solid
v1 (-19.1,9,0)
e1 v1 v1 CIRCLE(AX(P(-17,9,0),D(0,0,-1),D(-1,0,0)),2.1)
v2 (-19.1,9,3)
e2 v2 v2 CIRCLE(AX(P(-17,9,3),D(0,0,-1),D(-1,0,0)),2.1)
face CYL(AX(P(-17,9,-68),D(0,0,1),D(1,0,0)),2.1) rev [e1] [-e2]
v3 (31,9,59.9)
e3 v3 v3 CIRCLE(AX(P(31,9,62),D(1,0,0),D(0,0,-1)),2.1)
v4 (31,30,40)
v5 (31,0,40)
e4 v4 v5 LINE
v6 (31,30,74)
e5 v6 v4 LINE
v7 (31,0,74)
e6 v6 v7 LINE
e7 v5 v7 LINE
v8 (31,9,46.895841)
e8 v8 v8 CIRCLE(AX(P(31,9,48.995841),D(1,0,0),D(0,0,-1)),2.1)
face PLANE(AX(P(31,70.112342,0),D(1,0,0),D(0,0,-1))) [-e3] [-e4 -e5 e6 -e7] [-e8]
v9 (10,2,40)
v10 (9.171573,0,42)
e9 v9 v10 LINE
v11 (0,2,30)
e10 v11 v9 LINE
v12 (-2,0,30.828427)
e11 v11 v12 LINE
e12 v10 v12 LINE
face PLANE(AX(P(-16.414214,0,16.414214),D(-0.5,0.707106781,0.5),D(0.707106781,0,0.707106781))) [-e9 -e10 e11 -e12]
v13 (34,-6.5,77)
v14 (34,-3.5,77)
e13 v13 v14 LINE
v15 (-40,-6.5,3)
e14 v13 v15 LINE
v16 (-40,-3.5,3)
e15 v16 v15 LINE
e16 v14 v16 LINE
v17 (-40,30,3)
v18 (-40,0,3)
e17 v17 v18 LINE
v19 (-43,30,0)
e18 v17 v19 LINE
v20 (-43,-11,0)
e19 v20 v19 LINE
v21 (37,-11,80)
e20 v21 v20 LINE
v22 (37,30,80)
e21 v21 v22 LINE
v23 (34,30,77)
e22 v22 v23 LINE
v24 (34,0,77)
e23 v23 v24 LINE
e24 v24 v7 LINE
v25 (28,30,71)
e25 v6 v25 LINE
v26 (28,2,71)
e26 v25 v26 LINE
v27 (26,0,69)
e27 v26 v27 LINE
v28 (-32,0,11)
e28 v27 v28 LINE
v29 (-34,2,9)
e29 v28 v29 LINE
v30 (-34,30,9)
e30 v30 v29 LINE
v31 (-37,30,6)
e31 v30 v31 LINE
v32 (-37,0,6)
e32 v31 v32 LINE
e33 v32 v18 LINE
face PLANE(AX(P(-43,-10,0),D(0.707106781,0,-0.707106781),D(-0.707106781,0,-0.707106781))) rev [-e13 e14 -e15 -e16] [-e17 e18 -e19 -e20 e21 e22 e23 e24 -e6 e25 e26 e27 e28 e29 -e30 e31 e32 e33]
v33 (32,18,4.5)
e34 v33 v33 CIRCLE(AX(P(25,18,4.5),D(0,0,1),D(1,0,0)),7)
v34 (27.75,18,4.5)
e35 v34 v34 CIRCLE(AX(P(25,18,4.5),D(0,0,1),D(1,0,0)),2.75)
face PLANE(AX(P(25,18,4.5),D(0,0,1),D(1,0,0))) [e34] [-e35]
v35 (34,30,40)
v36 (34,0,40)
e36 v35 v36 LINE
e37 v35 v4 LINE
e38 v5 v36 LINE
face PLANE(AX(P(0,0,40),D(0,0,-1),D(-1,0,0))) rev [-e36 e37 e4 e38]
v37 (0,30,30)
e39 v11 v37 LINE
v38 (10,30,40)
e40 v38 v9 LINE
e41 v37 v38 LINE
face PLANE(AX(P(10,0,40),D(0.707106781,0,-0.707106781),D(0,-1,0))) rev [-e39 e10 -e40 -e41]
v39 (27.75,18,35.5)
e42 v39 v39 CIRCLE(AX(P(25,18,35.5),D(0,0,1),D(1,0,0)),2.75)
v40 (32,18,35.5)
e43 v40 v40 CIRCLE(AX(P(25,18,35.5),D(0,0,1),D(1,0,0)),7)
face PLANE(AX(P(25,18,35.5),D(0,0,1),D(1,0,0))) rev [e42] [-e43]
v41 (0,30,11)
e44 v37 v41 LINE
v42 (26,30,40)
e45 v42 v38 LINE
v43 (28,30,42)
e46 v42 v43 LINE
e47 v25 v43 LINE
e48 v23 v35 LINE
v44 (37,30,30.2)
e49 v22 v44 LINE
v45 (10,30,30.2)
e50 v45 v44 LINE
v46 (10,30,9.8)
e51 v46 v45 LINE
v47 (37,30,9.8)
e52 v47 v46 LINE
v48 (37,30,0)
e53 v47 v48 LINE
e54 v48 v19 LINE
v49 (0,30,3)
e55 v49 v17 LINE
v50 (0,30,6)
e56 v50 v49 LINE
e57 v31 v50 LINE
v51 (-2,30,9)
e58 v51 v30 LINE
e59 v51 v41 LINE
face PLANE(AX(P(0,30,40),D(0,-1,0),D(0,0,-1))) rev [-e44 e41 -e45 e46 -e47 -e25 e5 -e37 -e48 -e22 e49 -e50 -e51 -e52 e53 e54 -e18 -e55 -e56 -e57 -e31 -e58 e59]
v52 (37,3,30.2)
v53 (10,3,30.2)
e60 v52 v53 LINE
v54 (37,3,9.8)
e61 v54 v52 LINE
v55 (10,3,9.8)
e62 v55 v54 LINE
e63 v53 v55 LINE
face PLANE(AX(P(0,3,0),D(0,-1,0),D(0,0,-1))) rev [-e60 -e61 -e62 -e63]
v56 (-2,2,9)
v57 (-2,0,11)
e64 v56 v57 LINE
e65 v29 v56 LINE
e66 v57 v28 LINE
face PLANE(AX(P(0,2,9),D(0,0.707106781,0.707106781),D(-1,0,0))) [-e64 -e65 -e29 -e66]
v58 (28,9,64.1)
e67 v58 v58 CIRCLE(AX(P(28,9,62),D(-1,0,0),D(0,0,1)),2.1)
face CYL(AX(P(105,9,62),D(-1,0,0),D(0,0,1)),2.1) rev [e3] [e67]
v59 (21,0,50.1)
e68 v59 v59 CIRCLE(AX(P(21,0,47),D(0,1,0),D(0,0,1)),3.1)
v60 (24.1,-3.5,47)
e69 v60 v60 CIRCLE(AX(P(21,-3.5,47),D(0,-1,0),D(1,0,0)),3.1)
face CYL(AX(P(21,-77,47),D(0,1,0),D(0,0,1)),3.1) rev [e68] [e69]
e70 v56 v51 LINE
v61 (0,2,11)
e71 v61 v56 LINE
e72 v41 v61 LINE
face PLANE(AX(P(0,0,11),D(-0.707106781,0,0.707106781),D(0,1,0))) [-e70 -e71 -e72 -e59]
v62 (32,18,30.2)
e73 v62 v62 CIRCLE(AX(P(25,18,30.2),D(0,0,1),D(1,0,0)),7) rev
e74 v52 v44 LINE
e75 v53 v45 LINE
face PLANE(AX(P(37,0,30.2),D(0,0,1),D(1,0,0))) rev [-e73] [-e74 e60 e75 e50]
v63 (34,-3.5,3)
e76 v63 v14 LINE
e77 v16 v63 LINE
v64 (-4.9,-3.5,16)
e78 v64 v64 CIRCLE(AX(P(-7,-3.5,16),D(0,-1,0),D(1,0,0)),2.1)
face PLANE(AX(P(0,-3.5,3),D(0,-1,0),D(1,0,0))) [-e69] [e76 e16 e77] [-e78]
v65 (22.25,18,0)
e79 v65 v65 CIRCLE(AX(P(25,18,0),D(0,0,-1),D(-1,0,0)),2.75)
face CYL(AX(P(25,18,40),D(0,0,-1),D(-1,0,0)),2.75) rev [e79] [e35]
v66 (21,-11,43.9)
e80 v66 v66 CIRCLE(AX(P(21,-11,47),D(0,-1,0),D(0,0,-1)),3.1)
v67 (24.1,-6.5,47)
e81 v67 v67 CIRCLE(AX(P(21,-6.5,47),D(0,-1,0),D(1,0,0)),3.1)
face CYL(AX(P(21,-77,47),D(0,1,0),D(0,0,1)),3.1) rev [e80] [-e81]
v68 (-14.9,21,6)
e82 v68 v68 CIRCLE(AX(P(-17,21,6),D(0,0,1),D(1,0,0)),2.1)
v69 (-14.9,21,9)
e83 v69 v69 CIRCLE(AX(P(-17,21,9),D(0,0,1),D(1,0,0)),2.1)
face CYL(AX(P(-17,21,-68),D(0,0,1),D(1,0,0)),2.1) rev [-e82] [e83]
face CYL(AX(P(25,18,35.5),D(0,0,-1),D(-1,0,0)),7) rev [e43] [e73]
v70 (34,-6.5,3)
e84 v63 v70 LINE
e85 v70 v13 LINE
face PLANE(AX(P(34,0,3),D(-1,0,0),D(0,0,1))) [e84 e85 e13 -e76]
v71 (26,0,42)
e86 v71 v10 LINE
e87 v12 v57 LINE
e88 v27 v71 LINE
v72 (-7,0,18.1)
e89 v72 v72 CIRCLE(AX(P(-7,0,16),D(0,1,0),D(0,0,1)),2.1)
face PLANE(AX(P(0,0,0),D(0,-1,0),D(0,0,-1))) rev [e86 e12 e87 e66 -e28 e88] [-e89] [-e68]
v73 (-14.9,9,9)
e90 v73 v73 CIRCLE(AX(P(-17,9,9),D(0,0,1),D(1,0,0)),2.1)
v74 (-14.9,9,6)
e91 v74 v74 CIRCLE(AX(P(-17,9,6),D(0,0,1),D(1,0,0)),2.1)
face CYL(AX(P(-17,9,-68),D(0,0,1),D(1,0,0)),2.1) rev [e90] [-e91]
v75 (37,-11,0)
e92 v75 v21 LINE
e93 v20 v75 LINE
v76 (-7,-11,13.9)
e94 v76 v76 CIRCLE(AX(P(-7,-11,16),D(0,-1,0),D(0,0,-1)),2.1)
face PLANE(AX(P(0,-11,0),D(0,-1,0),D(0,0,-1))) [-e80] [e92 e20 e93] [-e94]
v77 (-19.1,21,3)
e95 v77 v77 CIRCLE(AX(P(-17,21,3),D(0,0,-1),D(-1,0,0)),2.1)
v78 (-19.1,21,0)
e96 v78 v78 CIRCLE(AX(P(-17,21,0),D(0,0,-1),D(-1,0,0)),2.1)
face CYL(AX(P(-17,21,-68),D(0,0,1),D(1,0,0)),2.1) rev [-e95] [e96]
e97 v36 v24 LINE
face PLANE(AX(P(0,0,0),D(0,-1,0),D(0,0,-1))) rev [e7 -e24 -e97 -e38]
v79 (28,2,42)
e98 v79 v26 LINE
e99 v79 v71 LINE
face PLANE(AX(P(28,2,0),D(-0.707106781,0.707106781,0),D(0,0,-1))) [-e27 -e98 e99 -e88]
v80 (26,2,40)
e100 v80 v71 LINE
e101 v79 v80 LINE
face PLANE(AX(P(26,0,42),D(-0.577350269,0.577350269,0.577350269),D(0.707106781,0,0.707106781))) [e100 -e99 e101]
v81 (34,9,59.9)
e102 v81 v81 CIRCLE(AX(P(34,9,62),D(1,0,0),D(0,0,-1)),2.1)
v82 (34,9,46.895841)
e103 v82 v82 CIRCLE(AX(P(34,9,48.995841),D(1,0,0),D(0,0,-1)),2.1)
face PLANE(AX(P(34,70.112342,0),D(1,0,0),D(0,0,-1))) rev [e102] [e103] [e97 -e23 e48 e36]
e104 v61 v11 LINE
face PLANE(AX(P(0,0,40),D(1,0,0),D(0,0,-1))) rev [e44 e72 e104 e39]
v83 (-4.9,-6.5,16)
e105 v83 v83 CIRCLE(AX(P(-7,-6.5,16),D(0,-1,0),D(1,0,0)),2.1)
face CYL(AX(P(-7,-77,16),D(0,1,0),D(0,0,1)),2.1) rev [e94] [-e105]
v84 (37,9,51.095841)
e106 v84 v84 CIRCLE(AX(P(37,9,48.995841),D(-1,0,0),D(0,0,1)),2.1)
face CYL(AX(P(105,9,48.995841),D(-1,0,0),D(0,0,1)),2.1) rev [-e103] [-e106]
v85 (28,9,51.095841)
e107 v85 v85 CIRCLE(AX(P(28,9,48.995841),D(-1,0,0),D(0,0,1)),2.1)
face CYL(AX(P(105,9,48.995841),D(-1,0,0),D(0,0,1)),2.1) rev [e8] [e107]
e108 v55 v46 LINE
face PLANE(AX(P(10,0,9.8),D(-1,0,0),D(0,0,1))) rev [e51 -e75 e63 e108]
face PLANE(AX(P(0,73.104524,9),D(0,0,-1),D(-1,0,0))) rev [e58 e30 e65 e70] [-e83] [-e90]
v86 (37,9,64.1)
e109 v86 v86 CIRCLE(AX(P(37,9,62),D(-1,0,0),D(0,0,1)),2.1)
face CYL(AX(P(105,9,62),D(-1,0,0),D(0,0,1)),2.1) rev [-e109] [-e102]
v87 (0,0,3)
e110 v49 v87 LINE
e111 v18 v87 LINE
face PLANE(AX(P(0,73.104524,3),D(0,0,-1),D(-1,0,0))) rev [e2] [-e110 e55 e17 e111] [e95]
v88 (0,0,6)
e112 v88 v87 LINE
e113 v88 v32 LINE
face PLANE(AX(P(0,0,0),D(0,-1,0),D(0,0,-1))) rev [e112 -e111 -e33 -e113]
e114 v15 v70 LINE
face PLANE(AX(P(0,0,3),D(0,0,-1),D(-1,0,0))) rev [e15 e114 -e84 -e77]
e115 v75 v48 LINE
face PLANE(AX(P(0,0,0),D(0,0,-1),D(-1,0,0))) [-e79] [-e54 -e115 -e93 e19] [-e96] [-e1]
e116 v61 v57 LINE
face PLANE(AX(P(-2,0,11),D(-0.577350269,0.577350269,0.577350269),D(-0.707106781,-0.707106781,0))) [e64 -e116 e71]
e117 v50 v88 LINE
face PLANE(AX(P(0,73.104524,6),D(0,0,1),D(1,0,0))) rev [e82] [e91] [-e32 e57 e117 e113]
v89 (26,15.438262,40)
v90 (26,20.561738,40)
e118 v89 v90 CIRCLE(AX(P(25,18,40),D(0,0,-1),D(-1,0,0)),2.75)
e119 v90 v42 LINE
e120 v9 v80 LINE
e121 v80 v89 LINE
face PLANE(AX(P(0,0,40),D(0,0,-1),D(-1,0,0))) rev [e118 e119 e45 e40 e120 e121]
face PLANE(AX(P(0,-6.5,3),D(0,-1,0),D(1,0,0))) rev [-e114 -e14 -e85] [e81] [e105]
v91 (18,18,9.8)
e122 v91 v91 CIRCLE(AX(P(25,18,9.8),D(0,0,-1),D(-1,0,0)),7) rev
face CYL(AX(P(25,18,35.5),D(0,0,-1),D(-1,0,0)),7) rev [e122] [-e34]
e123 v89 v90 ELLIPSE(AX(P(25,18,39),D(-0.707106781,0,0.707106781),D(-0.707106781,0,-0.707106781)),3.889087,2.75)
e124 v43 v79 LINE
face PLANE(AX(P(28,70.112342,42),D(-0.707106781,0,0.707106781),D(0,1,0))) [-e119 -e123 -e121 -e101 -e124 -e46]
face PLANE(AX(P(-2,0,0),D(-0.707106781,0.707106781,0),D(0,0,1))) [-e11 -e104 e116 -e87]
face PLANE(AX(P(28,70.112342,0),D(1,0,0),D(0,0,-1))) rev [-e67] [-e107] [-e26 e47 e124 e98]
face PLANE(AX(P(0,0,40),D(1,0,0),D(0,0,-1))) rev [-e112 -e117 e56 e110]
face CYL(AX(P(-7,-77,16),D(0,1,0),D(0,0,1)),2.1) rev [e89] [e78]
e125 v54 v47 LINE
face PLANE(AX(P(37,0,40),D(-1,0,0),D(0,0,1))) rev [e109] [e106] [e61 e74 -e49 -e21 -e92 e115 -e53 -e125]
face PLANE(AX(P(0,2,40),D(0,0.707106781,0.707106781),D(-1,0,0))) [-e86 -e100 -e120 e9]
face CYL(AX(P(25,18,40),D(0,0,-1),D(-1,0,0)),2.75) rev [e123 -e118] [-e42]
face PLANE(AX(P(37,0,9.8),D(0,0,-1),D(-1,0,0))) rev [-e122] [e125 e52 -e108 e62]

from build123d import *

# Parameters (mm, degrees)
SZKIC1_W                        = 37
SZKIC1_H                        = 30
DODANIE_WYCI_GNI_CIE1_DEPTH     = 40
SZKIC2_W                        = 27
SZKIC2_H                        = 20.4
WYTNIJ_WYCI_GNI_CIE1_DEPTH      = 30
WYTNIJ_WYCI_GNI_CIE2_DEPTH      = 15.5
WYTNIJ_WYCI_GNI_CIE2_DEPTH_BACK = 15.5
SZKIC3_R                        = 7
SZKIC4_R                        = 2.75
WYTNIJ_WYCI_GNI_CIE3_DEPTH      = 63.20128616
SZKIC5_W                        = 27
SZKIC5_H                        = 20.4
DODANIE_WYCI_GNI_CIE2_DEPTH     = 3
DODANIE_WYCI_GNI_CIE3_DEPTH     = 10
SZKIC8_W                        = 74
SZKIC8_H                        = 3
WYTNIJ_WYCI_GNI_CIE4_DEPTH      = 77
DODANIE_WYCI_GNI_CIE4_DEPTH     = 30
DODANIE_WYCI_GNI_CIE5_DEPTH     = 30
SZKIC11_R                       = 2.1
SZKIC11_R_2                     = 3.1
WYTNIJ_WYCI_GNI_CIE5_DEPTH      = 77
SZKIC12_R                       = 2.1
WYTNIJ_WYCI_GNI_CIE6_DEPTH      = 77
SFAZOWANIE2_SIZE                = 10
SFAZOWANIE3_SIZE                = 2
SZKIC13_R                       = 2.1
WYTNIJ_WYCI_GNI_CIE7_DEPTH      = 77
SZKIC14_R                       = 3.1
SZKIC14_R_2                     = 2.1
DODANIE_WYCI_GNI_CIE6_DEPTH     = 1


with BuildPart() as part:
    # Szkic1 → Dodanie-wyciągnięcie1 (new body)
    with BuildSketch(Plane.XY):
        with Locations((18.5, 15)):
            Rectangle(SZKIC1_W, SZKIC1_H)
    extrude(amount=DODANIE_WYCI_GNI_CIE1_DEPTH)

    # Szkic2 → Wytnij-wyciągnięcie1 (cut)
    with BuildSketch(Plane(origin=(0, 30, 0), x_dir=(1, 0, 0), z_dir=(0, 1, 0))):
        with Locations((23.5, -20)):
            Rectangle(SZKIC2_W, SZKIC2_H)
    extrude(amount=-WYTNIJ_WYCI_GNI_CIE1_DEPTH, mode=Mode.SUBTRACT)

    # Szkic3 → Wytnij-wyciągnięcie2 (cut, two sides: drawn at the far end of the back side and taken through both)
    with BuildSketch(Plane.XY.offset(20).offset(-WYTNIJ_WYCI_GNI_CIE2_DEPTH_BACK)):
        with Locations(Location((25, 18, 0), (0, 0, 180))):
            Circle(SZKIC3_R)
    extrude(amount=WYTNIJ_WYCI_GNI_CIE2_DEPTH + WYTNIJ_WYCI_GNI_CIE2_DEPTH_BACK, mode=Mode.SUBTRACT)

    # Szkic4 → Wytnij-wyciągnięcie3 (cut, through all)
    with BuildSketch(Plane(origin=(0, 0, 0), x_dir=(-1, 0, 0), z_dir=(0, 0, -1))):
        with Locations((-25, 18)):
            Circle(SZKIC4_R)
    extrude(amount=-WYTNIJ_WYCI_GNI_CIE3_DEPTH, mode=Mode.SUBTRACT)

    # Szkic5 → Dodanie-wyciągnięcie2 (add)
    with BuildSketch(Plane.XZ):
        with Locations((23.5, 20)):
            Rectangle(SZKIC5_W, SZKIC5_H)
    extrude(amount=-DODANIE_WYCI_GNI_CIE2_DEPTH)

    # Szkic6 → Dodanie-wyciągnięcie3 (add)
    with BuildSketch(Plane.XZ):
        Polygon((37, 0), (-43, 0), (37, 80), align=None)
    extrude(amount=DODANIE_WYCI_GNI_CIE3_DEPTH)

    # Szkic8 → Wytnij-wyciągnięcie4 (cut)
    with BuildSketch(Plane(origin=(0, 0, 80), x_dir=(-1, 0, 0), z_dir=(0, 0, -1))):
        with Locations((3, -5)):
            Rectangle(SZKIC8_W, SZKIC8_H)
    extrude(amount=WYTNIJ_WYCI_GNI_CIE4_DEPTH, mode=Mode.SUBTRACT)

    # Szkic9 → Dodanie-wyciągnięcie4 (add)
    with BuildSketch(Plane(origin=(0, 0, 0), x_dir=(1, 0, 0), z_dir=(0, 1, 0))):
        Polygon((0, 0), (-43, 0), (-40, -3), (0, -3), align=None)
        Polygon((0, -6), (0, -9), (-34, -9), (-37, -6), align=None)
    extrude(amount=DODANIE_WYCI_GNI_CIE4_DEPTH)

    # Szkic10 → Dodanie-wyciągnięcie5 (add)
    with BuildSketch(Plane(origin=(0, 0, 0), x_dir=(1, 0, 0), z_dir=(0, 1, 0))):
        Polygon((31, -74), (31, -40), (28, -40), (28, -71), align=None)
        Polygon((37, -80), (37, -40), (34, -40), (34, -77), align=None)
    extrude(amount=DODANIE_WYCI_GNI_CIE5_DEPTH)

    # Szkic11 → Wytnij-wyciągnięcie5 (cut)
    with BuildSketch(Plane(origin=(0, 0, 0), x_dir=(1, 0, 0), z_dir=(0, 1, 0))):
        with Locations((-7, -16)):
            Circle(SZKIC11_R)
        with Locations((21, -47)):
            Circle(SZKIC11_R_2)
    extrude(amount=-WYTNIJ_WYCI_GNI_CIE5_DEPTH, mode=Mode.SUBTRACT)

    # Szkic12 → Wytnij-wyciągnięcie6 (cut)
    with BuildSketch(Plane.XY.offset(9)):
        with Locations((-17, 21)):
            Circle(SZKIC12_R)
        with Locations((-17, 9)):
            Circle(SZKIC12_R)
    extrude(amount=-WYTNIJ_WYCI_GNI_CIE6_DEPTH, mode=Mode.SUBTRACT)

    # Sfazowanie2
    sfazowanie2_edges = [part.edges().sort_by_distance(p)[0] for p in [
        (0, 15, 40),
    ]]
    chamfer(sfazowanie2_edges, length=SFAZOWANIE2_SIZE)

    # Sfazowanie3
    # the kernel refuses this chamfer: 2 mm, written as the material it adds along each edge
    with BuildSketch(Plane(origin=(-1.333333333, 1.333333333, 10.333333333), x_dir=(0.7071067811865475, 0.7071067811865475, 0), z_dir=(0.5773502691896258, -0.5773502691896258, -0.5773502691896256))) as sfazowanie3_piece_1_section:
        Polygon((-1.414213562, 0.816496581), (1.414213562, 0.816496581), (0, -1.632993162), align=None)
    sfazowanie3_piece_1 = extrude(amount=2.540341184, mode=Mode.PRIVATE)
    sfazowanie3_piece_1 = split(sfazowanie3_piece_1, bisect_by=Plane(origin=(0, 0, 9), z_dir=(0, 1, 0)), keep=Keep.TOP, mode=Mode.PRIVATE)
    sfazowanie3_piece_1 = split(sfazowanie3_piece_1, bisect_by=Plane(origin=(0, 0, 9), z_dir=(-1, 0, 0)), keep=Keep.TOP, mode=Mode.PRIVATE)
    sfazowanie3_piece_1 = split(sfazowanie3_piece_1, bisect_by=Plane(origin=(0, 0, 9), z_dir=(0, 0, 1)), keep=Keep.TOP, mode=Mode.PRIVATE)
    add(sfazowanie3_piece_1)
    with BuildSketch(Plane(origin=(26.666666667, 1.333333333, 41.333333333), x_dir=(0, -0.7071067811865475, 0.7071067811865475), z_dir=(0.5773502691896257, -0.5773502691896258, -0.5773502691896258))) as sfazowanie3_piece_2_section:
        Polygon((-1.414213562, 0.816496581), (1.414213562, 0.816496581), (0, -1.632993162), align=None)
    sfazowanie3_piece_2 = extrude(amount=2.540341184, mode=Mode.PRIVATE)
    sfazowanie3_piece_2 = split(sfazowanie3_piece_2, bisect_by=Plane(origin=(28, 0, 40), z_dir=(0, 0, 1)), keep=Keep.TOP, mode=Mode.PRIVATE)
    sfazowanie3_piece_2 = split(sfazowanie3_piece_2, bisect_by=Plane(origin=(28, 0, 40), z_dir=(0, 1, 0)), keep=Keep.TOP, mode=Mode.PRIVATE)
    sfazowanie3_piece_2 = split(sfazowanie3_piece_2, bisect_by=Plane(origin=(28, 0, 40), z_dir=(-1, 0, 0)), keep=Keep.TOP, mode=Mode.PRIVATE)
    add(sfazowanie3_piece_2)
    with BuildSketch(Plane(origin=(0, -5.143365976, 9), x_dir=(0, 0, 1), z_dir=(0, 1, 0))) as sfazowanie3_piece_3_section:
        Polygon((SFAZOWANIE3_SIZE, 0), (0, -SFAZOWANIE3_SIZE), (0, 0), align=None)
    sfazowanie3_piece_3 = extrude(amount=35.143365976, mode=Mode.PRIVATE)
    sfazowanie3_piece_3 = split(sfazowanie3_piece_3, bisect_by=Plane(origin=(0, -3.5, 9), z_dir=(0, 1, 0)), keep=Keep.TOP, mode=Mode.PRIVATE)
    add(sfazowanie3_piece_3)
    with BuildSketch(Plane(origin=(5.143365976, 0, 9), x_dir=(0, 1, 0), z_dir=(-1, 0, 0))) as sfazowanie3_piece_4_section:
        Polygon((SFAZOWANIE3_SIZE, 0), (0, -SFAZOWANIE3_SIZE), (0, 0), align=None)
    sfazowanie3_piece_4 = extrude(amount=44.286731952, mode=Mode.PRIVATE)
    sfazowanie3_piece_4 = split(sfazowanie3_piece_4, bisect_by=Plane(origin=(-14.428317012, 0, 28.571682988), z_dir=(0.7071067811865476, 0, -0.7071067811865475)), keep=Keep.TOP, mode=Mode.PRIVATE)
    add(sfazowanie3_piece_4)
    with BuildSketch(Plane(origin=(28, -5.143365976, 40), x_dir=(-1, 0, 0), z_dir=(0, 1, 0))) as sfazowanie3_piece_5_section:
        Polygon((SFAZOWANIE3_SIZE, 0), (0, SFAZOWANIE3_SIZE), (0, 0), align=None)
    sfazowanie3_piece_5 = extrude(amount=35.143365976, mode=Mode.PRIVATE)
    sfazowanie3_piece_5 = sfazowanie3_piece_5 - Plane(origin=(25, 18, 40), x_dir=(-1, 0, 0), z_dir=(0, 0, -1)) * Cylinder(2.75, 79, mode=Mode.PRIVATE)
    sfazowanie3_piece_5 = split(sfazowanie3_piece_5, bisect_by=Plane(origin=(28, -3.5, 40), z_dir=(0, 1, 0)), keep=Keep.TOP, mode=Mode.PRIVATE)
    add(sfazowanie3_piece_5)
    with BuildSketch(Plane(origin=(28, 0, 34.856634024), x_dir=(0, 1, 0), z_dir=(0, 0, 1))) as sfazowanie3_piece_6_section:
        Polygon((SFAZOWANIE3_SIZE, 0), (0, SFAZOWANIE3_SIZE), (0, 0), align=None)
    sfazowanie3_piece_6 = extrude(amount=41.286731952, mode=Mode.PRIVATE)
    sfazowanie3_piece_6 = split(sfazowanie3_piece_6, bisect_by=Plane(origin=(9.928317012, 0, 52.928317012), z_dir=(0.7071067811865476, 0, -0.7071067811865475)), keep=Keep.TOP, mode=Mode.PRIVATE)
    add(sfazowanie3_piece_6)
    with BuildSketch(Plane(origin=(4.856634024, 0, 40), x_dir=(0, 1, 0), z_dir=(1, 0, 0))) as sfazowanie3_piece_7_section:
        Polygon((SFAZOWANIE3_SIZE, 0), (0, SFAZOWANIE3_SIZE), (0, 0), align=None)
    sfazowanie3_piece_7 = extrude(amount=28.286731952, mode=Mode.PRIVATE)
    sfazowanie3_piece_7 = split(sfazowanie3_piece_7, bisect_by=Plane(origin=(7.428317012, 0, 37.428317012), z_dir=(0.7071067811865476, 0, -0.7071067811865476)), keep=Keep.TOP, mode=Mode.PRIVATE)
    sfazowanie3_piece_7 = split(sfazowanie3_piece_7, bisect_by=Plane(origin=(31, 0, 40), z_dir=(-1, 0, 0)), keep=Keep.TOP, mode=Mode.PRIVATE)
    add(sfazowanie3_piece_7)
    with BuildSketch(Plane(origin=(0, 0, 3.856634024), x_dir=(0, 1, 0), z_dir=(0, 0, 1))) as sfazowanie3_piece_8_section:
        Polygon((SFAZOWANIE3_SIZE, 0), (0, SFAZOWANIE3_SIZE), (0, 0), align=None)
    sfazowanie3_piece_8 = extrude(amount=31.286731952, mode=Mode.PRIVATE)
    sfazowanie3_piece_8 = split(sfazowanie3_piece_8, bisect_by=Plane(origin=(-13.071682988, 0, 16.928317012), z_dir=(0.7071067811865476, 0, -0.7071067811865476)), keep=Keep.TOP, mode=Mode.PRIVATE)
    sfazowanie3_piece_8 = split(sfazowanie3_piece_8, bisect_by=Plane(origin=(0, 0, 6), z_dir=(0, 0, 1)), keep=Keep.TOP, mode=Mode.PRIVATE)
    add(sfazowanie3_piece_8)
    with BuildSketch(Plane(origin=(13.63690896, 0, 43.63690896), x_dir=(0, 1, 0), z_dir=(-0.7071067811865476, 0, -0.7071067811865476))) as sfazowanie3_piece_9_section:
        Polygon((SFAZOWANIE3_SIZE, 0), (0, -SFAZOWANIE3_SIZE), (0, 0), align=None)
    sfazowanie3_piece_9 = extrude(amount=24.428867576, mode=Mode.PRIVATE)
    sfazowanie3_piece_9 = split(sfazowanie3_piece_9, bisect_by=Plane(origin=(13.63690896, 0, 40), z_dir=(0, 0, -1)), keep=Keep.TOP, mode=Mode.PRIVATE)
    sfazowanie3_piece_9 = split(sfazowanie3_piece_9, bisect_by=Plane(origin=(0, 0, 43.63690896), z_dir=(1, 0, 0)), keep=Keep.TOP, mode=Mode.PRIVATE)
    add(sfazowanie3_piece_9)
    with BuildSketch(Plane(origin=(4.856634024, 0, 40), x_dir=(0, 1, 0), z_dir=(1, 0, 0))) as sfazowanie3_piece_10a_section:
        Polygon((SFAZOWANIE3_SIZE, 0), (0, SFAZOWANIE3_SIZE), (0, 0), align=None)
    sfazowanie3_piece_10a = extrude(amount=23.143365976, mode=Mode.PRIVATE)
    sfazowanie3_piece_10a = split(sfazowanie3_piece_10a, bisect_by=Plane(origin=(7.428317012, 0, 37.428317012), z_dir=(-0.7071067811865476, 0, 0.7071067811865476)), keep=Keep.TOP, mode=Mode.PRIVATE)
    with BuildSketch(Plane(origin=(13.63690896, 0, 43.63690896), x_dir=(0, 1, 0), z_dir=(-0.7071067811865476, 0, -0.7071067811865476))) as sfazowanie3_piece_10b_section:
        Polygon((SFAZOWANIE3_SIZE, 0), (0, -SFAZOWANIE3_SIZE), (0, 0), align=None)
    sfazowanie3_piece_10b = extrude(amount=24.428867576, mode=Mode.PRIVATE)
    sfazowanie3_piece_10b = split(sfazowanie3_piece_10b, bisect_by=Plane(origin=(13.63690896, 0, 40), z_dir=(0, 0, 1)), keep=Keep.TOP, mode=Mode.PRIVATE)
    sfazowanie3_piece_10 = sfazowanie3_piece_10a & sfazowanie3_piece_10b
    add(sfazowanie3_piece_10)
    with BuildSketch(Plane(origin=(13.63690896, 0, 43.63690896), x_dir=(0, 1, 0), z_dir=(-0.7071067811865476, 0, -0.7071067811865476))) as sfazowanie3_piece_11a_section:
        Polygon((SFAZOWANIE3_SIZE, 0), (0, -SFAZOWANIE3_SIZE), (0, 0), align=None)
    sfazowanie3_piece_11a = extrude(amount=24.428867576, mode=Mode.PRIVATE)
    sfazowanie3_piece_11a = split(sfazowanie3_piece_11a, bisect_by=Plane(origin=(0, 0, 43.63690896), z_dir=(-1, 0, 0)), keep=Keep.TOP, mode=Mode.PRIVATE)
    with BuildSketch(Plane(origin=(0, 0, 9), x_dir=(0, 1, 0), z_dir=(0, 0, 1))) as sfazowanie3_piece_11b_section:
        Polygon((SFAZOWANIE3_SIZE, 0), (0, SFAZOWANIE3_SIZE), (0, 0), align=None)
    sfazowanie3_piece_11b = extrude(amount=26.143365976, mode=Mode.PRIVATE)
    sfazowanie3_piece_11b = split(sfazowanie3_piece_11b, bisect_by=Plane(origin=(-10.5, 0, 19.5), z_dir=(-0.7071067811865476, 0, 0.7071067811865476)), keep=Keep.TOP, mode=Mode.PRIVATE)
    sfazowanie3_piece_11 = sfazowanie3_piece_11a & sfazowanie3_piece_11b
    add(sfazowanie3_piece_11)

    # Szkic13 → Wytnij-wyciągnięcie7 (cut)
    with BuildSketch(Plane.ZY.offset(-28)):
        with Locations((48.995840686, 9)):
            Circle(SZKIC13_R)
        with Locations((62, 9)):
            Circle(SZKIC13_R)
    extrude(amount=-WYTNIJ_WYCI_GNI_CIE7_DEPTH, mode=Mode.SUBTRACT)

    # Szkic14 → Dodanie-wyciągnięcie6 (add)
    with BuildSketch(Plane.XZ.offset(10)):
        Polygon((37, 0), (37, 80), (-43, 0), align=None)
        with Locations((21, 47)):
            Circle(SZKIC14_R, mode=Mode.SUBTRACT)
        with Locations((-7, 16)):
            Circle(SZKIC14_R_2, mode=Mode.SUBTRACT)
    extrude(amount=DODANIE_WYCI_GNI_CIE6_DEPTH)


solid = part.part
